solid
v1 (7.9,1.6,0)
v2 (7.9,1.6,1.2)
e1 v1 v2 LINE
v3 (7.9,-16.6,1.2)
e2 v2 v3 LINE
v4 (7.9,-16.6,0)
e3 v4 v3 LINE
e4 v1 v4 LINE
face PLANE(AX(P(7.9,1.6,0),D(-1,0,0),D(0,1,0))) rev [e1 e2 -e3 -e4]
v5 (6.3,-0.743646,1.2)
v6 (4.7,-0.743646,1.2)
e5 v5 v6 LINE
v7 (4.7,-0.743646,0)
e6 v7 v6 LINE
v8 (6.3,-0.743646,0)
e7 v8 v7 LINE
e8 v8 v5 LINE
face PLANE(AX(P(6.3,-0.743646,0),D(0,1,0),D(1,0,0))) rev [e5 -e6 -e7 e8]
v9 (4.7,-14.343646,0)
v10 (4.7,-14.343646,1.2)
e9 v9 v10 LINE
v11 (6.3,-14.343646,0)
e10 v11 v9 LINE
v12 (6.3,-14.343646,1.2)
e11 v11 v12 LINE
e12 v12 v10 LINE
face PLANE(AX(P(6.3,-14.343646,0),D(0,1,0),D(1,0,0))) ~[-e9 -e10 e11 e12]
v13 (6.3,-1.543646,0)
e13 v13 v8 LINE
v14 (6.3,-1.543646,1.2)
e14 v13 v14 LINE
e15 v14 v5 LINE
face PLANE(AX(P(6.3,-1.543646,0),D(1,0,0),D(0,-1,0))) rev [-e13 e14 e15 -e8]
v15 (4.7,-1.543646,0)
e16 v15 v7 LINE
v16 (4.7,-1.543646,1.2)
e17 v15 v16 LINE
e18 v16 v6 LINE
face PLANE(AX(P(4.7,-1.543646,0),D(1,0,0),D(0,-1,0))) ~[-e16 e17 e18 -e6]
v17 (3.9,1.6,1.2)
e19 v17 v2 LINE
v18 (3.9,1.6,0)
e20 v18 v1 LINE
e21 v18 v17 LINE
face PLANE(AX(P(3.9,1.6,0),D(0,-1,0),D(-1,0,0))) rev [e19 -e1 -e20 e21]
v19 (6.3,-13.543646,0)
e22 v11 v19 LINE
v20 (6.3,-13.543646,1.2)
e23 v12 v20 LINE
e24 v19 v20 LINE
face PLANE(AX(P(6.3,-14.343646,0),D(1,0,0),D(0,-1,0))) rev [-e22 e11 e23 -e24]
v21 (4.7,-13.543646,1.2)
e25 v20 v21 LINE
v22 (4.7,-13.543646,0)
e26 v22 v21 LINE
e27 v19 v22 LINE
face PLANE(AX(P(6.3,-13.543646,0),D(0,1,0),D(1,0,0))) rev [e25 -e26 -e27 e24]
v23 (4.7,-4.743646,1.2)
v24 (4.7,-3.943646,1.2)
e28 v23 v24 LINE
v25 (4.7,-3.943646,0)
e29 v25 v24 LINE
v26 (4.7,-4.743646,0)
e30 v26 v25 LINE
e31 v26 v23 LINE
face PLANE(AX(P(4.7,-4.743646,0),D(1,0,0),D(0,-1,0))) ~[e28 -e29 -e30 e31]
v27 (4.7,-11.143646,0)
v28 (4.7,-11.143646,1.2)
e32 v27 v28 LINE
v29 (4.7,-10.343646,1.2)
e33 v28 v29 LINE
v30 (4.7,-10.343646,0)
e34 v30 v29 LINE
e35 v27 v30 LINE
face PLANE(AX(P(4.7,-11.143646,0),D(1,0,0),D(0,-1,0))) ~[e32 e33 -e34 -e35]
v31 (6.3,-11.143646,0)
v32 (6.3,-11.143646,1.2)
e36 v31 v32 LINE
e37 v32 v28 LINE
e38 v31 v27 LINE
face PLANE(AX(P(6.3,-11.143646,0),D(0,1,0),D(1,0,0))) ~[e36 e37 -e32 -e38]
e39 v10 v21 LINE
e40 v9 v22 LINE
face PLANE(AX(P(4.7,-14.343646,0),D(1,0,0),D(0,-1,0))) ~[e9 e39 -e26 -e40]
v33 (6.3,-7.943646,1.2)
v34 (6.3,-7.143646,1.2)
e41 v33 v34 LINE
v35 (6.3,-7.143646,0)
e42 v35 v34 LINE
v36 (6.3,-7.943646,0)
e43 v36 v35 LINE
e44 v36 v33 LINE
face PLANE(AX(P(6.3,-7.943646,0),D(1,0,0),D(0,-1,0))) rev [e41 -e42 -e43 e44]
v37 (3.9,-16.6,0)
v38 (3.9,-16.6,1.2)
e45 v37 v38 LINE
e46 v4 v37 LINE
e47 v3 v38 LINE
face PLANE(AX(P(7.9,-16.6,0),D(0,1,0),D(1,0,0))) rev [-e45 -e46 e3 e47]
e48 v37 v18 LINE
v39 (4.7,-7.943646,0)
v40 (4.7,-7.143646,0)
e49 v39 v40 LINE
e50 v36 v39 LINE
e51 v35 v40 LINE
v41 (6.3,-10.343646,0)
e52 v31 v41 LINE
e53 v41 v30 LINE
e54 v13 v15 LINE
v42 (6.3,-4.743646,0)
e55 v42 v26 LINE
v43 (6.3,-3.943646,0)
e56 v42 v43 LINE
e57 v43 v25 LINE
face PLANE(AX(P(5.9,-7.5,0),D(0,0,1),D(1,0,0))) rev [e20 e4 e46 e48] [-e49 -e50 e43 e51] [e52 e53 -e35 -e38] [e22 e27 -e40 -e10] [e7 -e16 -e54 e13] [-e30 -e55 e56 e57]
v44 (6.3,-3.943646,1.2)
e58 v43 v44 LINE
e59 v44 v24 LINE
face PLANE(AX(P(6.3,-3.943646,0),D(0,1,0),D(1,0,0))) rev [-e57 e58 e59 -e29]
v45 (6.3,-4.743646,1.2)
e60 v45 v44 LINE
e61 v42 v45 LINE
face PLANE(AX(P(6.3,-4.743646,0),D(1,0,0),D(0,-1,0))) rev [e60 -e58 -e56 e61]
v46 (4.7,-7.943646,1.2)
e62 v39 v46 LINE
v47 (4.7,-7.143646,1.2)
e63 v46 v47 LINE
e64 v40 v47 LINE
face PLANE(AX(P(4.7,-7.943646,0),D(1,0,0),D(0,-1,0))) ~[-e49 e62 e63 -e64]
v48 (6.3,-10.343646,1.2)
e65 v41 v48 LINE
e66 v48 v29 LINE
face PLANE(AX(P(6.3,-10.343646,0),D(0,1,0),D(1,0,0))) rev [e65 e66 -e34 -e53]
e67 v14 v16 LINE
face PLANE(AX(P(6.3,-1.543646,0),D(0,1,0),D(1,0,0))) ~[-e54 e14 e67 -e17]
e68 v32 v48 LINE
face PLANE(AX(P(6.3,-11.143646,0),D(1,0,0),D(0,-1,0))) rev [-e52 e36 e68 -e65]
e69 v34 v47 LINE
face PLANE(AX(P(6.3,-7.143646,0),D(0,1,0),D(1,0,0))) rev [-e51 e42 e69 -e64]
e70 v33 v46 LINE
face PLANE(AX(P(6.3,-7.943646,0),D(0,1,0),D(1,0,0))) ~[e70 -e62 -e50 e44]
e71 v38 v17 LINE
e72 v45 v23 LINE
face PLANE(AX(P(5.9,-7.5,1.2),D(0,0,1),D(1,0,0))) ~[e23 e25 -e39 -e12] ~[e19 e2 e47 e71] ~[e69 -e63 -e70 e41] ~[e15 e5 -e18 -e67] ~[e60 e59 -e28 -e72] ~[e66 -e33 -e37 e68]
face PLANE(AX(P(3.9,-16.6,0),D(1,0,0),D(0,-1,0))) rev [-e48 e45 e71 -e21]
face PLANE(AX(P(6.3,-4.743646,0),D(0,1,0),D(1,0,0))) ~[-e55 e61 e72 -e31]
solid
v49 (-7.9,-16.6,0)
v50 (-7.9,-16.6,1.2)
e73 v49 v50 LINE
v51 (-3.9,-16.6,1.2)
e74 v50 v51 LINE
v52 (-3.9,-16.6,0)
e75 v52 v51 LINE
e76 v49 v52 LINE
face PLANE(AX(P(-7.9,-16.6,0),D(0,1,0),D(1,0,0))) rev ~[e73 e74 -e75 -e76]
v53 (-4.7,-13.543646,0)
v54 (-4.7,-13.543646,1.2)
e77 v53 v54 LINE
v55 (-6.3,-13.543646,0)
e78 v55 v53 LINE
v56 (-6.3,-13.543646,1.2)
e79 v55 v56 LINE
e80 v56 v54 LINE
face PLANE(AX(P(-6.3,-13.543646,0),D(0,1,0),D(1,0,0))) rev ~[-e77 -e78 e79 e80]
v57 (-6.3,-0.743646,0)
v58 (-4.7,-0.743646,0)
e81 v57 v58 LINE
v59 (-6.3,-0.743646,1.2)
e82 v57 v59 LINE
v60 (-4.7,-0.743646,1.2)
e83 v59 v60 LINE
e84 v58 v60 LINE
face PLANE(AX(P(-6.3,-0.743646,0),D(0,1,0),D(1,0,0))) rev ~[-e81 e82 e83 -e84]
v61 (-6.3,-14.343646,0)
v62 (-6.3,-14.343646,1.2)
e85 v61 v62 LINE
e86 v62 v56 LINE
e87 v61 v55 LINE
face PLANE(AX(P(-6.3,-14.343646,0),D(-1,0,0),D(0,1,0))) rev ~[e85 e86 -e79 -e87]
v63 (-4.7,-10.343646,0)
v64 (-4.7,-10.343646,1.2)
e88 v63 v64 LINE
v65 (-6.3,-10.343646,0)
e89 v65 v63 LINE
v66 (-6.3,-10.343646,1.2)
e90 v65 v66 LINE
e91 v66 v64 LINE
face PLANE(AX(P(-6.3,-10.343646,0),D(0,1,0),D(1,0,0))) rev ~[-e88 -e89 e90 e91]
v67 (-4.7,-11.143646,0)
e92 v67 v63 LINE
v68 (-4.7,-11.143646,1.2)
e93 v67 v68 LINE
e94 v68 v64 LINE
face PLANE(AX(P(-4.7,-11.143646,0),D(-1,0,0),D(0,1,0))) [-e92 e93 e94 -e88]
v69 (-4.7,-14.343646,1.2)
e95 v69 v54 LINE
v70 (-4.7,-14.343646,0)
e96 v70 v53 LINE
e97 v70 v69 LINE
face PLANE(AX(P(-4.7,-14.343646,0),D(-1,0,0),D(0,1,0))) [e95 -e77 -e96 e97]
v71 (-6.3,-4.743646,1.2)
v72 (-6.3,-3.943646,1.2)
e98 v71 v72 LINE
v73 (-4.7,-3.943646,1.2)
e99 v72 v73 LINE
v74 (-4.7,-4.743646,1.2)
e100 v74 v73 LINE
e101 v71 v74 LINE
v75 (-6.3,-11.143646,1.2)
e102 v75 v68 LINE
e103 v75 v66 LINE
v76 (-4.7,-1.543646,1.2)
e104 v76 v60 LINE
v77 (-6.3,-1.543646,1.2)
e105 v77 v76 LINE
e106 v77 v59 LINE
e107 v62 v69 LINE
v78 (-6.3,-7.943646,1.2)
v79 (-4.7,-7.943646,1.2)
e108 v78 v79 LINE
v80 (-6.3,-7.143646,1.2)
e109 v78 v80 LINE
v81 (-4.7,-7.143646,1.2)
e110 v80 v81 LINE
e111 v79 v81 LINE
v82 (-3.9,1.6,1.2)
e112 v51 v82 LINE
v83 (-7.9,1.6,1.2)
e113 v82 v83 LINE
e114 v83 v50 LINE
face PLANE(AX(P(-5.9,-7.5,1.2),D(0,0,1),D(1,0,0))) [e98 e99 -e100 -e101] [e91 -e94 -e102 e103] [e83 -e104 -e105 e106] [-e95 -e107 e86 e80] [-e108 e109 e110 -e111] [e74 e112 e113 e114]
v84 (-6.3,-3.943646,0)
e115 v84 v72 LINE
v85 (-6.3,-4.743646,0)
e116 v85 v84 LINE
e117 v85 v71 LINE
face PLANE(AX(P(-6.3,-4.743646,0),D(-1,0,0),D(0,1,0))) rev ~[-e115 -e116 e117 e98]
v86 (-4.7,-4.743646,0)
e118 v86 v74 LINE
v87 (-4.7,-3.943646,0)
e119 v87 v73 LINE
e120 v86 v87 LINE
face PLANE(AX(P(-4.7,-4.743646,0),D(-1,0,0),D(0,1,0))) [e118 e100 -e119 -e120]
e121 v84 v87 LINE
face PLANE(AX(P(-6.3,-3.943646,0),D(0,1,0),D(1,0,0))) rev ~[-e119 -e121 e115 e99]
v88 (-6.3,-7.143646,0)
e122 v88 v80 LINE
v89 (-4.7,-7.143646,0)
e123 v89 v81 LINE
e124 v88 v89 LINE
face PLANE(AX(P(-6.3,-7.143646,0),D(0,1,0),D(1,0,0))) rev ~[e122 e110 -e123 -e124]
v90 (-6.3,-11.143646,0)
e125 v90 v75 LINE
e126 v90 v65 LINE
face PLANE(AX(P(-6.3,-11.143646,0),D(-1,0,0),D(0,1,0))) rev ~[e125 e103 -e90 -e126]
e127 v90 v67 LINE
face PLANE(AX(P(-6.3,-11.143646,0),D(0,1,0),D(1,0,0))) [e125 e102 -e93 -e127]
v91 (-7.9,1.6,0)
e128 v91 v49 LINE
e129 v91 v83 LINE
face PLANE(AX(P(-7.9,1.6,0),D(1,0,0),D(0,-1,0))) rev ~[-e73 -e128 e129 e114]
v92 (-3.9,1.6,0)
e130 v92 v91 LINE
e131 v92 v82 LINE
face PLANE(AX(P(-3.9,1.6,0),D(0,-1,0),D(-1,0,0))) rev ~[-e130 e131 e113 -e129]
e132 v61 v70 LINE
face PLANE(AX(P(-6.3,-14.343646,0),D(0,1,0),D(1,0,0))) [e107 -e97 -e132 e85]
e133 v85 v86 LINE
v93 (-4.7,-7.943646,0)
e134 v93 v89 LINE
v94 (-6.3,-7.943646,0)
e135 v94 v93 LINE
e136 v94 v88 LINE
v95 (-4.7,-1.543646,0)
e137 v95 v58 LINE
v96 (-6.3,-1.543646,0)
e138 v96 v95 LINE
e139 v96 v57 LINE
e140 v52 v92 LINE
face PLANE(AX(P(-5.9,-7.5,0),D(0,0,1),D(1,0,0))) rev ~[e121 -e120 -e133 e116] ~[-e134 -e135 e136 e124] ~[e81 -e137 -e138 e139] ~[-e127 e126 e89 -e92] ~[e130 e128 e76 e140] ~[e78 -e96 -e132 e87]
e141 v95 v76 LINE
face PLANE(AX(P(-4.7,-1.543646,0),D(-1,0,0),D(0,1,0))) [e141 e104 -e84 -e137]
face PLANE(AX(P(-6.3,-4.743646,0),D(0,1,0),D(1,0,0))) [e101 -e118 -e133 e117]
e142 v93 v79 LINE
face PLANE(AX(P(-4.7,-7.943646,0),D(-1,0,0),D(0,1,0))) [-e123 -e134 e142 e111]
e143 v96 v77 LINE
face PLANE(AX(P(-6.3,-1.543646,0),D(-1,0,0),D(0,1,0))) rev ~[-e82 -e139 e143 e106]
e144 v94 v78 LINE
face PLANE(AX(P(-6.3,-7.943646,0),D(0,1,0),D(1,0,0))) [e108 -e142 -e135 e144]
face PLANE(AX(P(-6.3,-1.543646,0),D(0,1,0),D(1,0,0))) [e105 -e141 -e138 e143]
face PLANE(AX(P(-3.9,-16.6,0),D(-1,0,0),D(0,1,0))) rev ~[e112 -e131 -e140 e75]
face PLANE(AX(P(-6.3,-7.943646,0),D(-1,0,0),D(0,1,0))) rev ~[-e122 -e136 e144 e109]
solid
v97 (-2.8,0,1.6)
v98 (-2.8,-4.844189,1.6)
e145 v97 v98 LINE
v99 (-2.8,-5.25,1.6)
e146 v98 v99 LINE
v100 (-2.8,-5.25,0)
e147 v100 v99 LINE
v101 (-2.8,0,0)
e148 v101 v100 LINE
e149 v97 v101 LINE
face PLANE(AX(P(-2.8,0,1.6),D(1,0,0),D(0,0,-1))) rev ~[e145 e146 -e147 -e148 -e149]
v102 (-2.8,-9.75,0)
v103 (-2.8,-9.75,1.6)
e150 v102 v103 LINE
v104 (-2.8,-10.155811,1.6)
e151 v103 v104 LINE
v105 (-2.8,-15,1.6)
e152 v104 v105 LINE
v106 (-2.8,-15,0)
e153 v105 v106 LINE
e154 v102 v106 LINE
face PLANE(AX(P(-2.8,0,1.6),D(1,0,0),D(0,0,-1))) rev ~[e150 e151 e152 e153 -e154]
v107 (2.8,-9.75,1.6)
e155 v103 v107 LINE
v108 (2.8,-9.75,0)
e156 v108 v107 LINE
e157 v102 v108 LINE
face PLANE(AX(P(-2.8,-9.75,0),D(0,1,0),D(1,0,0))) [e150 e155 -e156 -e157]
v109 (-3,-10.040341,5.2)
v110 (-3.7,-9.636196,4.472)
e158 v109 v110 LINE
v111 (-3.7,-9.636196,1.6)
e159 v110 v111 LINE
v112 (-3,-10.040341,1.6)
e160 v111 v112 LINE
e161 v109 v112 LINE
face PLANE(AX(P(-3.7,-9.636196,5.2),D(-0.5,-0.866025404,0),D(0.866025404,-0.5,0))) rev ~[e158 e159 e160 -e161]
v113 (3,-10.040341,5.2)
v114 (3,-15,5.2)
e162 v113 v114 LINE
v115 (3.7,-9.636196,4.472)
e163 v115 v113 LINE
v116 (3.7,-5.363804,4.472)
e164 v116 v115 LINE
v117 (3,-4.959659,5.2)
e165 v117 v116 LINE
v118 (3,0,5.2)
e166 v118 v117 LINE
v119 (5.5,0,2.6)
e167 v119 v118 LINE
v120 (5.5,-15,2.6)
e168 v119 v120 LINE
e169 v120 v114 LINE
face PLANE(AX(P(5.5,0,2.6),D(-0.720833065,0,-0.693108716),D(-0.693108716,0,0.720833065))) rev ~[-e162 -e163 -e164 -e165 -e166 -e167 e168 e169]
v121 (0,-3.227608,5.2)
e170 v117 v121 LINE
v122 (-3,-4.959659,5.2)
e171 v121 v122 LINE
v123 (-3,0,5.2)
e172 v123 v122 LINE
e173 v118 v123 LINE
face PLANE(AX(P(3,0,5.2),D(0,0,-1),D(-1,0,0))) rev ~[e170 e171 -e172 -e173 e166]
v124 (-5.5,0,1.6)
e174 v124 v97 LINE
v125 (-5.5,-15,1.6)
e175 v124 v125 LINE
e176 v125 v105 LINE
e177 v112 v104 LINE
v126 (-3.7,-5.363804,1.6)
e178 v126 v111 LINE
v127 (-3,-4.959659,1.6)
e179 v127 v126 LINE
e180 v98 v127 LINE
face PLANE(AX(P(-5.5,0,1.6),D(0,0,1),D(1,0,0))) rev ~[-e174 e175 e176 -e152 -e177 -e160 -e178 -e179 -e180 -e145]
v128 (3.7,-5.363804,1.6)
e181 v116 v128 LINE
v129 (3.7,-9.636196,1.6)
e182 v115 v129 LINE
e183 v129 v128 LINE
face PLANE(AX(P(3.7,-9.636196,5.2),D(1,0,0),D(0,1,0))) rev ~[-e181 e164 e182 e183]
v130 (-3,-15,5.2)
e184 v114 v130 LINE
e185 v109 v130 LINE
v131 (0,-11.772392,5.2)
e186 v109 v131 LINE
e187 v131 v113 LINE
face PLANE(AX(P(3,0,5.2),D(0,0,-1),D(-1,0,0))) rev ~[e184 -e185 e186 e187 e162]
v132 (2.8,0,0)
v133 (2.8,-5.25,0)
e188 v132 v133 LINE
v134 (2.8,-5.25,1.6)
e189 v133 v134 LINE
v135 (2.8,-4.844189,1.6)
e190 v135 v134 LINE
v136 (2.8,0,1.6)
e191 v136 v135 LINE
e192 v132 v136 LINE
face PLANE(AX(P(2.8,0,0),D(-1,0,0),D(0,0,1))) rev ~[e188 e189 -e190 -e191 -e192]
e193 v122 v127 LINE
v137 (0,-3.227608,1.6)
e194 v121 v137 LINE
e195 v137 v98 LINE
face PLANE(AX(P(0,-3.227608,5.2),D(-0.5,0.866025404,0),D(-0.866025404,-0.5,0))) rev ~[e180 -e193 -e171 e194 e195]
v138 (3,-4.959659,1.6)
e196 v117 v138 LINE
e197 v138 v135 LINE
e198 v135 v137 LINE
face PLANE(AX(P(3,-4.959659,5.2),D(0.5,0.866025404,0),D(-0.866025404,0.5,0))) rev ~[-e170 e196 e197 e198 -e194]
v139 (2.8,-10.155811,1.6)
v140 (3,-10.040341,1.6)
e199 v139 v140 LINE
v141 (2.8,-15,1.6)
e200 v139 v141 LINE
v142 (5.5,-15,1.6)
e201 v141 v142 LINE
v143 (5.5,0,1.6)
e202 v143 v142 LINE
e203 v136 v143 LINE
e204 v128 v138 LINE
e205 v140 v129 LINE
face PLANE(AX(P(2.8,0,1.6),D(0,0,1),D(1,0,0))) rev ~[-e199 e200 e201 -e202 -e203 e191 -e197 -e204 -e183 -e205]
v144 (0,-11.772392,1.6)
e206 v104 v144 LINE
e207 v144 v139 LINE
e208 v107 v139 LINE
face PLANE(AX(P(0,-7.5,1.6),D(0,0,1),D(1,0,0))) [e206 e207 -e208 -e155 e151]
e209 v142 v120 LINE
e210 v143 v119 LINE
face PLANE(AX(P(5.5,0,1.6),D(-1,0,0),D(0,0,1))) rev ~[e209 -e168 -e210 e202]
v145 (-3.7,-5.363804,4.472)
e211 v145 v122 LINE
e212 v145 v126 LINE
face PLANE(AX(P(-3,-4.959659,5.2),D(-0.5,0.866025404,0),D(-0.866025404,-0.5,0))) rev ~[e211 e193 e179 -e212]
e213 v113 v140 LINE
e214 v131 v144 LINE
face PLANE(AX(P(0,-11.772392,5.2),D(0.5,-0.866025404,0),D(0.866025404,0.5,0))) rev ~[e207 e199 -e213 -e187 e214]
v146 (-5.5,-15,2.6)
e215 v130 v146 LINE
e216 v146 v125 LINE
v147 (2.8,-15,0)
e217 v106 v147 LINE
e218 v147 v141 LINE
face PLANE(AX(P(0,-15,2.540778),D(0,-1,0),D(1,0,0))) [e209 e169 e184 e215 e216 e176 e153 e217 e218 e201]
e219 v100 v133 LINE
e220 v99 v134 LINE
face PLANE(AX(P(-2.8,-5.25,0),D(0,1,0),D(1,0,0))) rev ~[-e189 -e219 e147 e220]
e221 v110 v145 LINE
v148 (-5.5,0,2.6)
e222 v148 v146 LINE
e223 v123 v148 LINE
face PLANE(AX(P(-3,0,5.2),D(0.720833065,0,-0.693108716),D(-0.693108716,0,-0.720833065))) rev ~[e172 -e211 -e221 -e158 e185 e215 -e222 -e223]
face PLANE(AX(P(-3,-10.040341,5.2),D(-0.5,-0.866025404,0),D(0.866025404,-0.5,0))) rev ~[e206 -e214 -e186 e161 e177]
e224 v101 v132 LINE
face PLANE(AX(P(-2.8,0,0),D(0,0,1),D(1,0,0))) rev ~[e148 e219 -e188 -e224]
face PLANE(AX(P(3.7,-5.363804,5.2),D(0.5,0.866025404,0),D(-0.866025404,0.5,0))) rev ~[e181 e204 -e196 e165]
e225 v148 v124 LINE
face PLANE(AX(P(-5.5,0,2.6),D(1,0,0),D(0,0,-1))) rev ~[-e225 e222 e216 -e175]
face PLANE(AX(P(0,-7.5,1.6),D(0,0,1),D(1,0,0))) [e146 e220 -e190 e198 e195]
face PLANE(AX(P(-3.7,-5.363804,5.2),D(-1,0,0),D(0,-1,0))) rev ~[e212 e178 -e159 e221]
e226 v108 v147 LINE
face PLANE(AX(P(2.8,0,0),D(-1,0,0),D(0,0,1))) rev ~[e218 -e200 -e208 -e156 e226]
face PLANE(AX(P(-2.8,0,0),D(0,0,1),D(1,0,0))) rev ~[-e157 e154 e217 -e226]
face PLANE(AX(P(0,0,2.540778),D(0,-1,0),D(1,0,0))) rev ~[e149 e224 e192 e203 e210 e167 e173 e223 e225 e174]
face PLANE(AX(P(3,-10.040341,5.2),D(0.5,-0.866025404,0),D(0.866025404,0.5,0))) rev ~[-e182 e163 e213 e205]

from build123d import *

# Parameters (mm, degrees)
F1_DEPTH = 15
F3_DEPTH = 3.6
F4_W     = 1.6
F4_H     = 0.8
F5_DEPTH = 1.2
F4_W_2   = 5.6
F4_H_2   = 4.5
F6_DEPTH = 1.6


# Not quite as in the source:
# - a feature names something its author has since deleted; it is built from what else it names


with BuildPart() as f1:
    # F0 (on Front) → F1 (new body)
    with BuildSketch(Plane.XZ):
        Polygon((-2.8, 0), (0, 0), (2.8, 0), (2.8, 1.6), (5.5, 1.6), (5.5, 2.6), (3, 5.2), (0, 5.2), (-3, 5.2), (-5.5, 2.6), (-5.5, 1.6), (-2.8, 1.6), align=None)
    extrude(amount=F1_DEPTH)

    # F2 (on face) → F3 (cut, through all)
    with BuildSketch(Plane.XY.offset(5.2)):
        Polygon((3, -4.9596588156), (0, -3.227608008), (-3, -4.9596588156), (-3, -10.0403411844), (0, -11.772391992), (3, -10.0403411844), align=None)
        Polygon((3.7, -5.363804004), (3, -4.9596588156), (3, -10.0403411844), (3.7, -9.636195996), align=None)
        Polygon((-3, -10.0403411844), (-3, -4.9596588156), (-3.7, -5.363804004), (-3.7, -9.636195996), align=None)
    extrude(amount=-F3_DEPTH, mode=Mode.SUBTRACT)

    # F4 (on Top) → F6 (cut, through all)
    with BuildSketch(Plane.XY):
        with Locations((0, -7.5)):
            Rectangle(F4_W_2, F4_H_2)
    extrude(amount=F6_DEPTH, mode=Mode.SUBTRACT)


with BuildPart() as f5:
    # F4 (on Top) → F5 (new body)
    with BuildSketch(Plane.XY):
        Polygon((-3.9, -0.743646355), (-3.9, 1.6), (-7.9, 1.6), (-7.9, -16.6), (-3.9, -16.6), (-3.9, -14.343646355), (-3.9, -13.543646355), (-3.9, -12.743646355), (-3.9, -11.943646355), (-3.9, -11.143646355), (-3.9, -10.343646355), (-3.9, -9.543646355), (-3.9, -8.743646355), (-3.9, -7.943646355), (-3.9, -7.143646355), (-3.9, -6.343646355), (-3.9, -5.543646355), (-3.9, -4.743646355), (-3.9, -3.943646355), (-3.9, -3.143646355), (-3.9, -2.343646355), (-3.9, -1.543646355), align=None)
        with Locations((-5.5, -13.943646355)):
            Rectangle(F4_W, F4_H, mode=Mode.SUBTRACT)
        with Locations((-5.5, -10.743646355)):
            Rectangle(F4_W, F4_H, mode=Mode.SUBTRACT)
        with Locations((-5.5, -7.543646355)):
            Rectangle(F4_W, F4_H, mode=Mode.SUBTRACT)
        with Locations((-5.5, -4.343646355)):
            Rectangle(F4_W, F4_H, mode=Mode.SUBTRACT)
        with Locations((-5.5, -1.143646355)):
            Rectangle(F4_W, F4_H, mode=Mode.SUBTRACT)
    extrude(amount=F5_DEPTH)


with BuildPart() as f7_1:
    # F7: instance of F5
    add(f5.part.mirror(Plane.YZ))


solid = Compound([f1.part, f5.part, f7_1.part])
